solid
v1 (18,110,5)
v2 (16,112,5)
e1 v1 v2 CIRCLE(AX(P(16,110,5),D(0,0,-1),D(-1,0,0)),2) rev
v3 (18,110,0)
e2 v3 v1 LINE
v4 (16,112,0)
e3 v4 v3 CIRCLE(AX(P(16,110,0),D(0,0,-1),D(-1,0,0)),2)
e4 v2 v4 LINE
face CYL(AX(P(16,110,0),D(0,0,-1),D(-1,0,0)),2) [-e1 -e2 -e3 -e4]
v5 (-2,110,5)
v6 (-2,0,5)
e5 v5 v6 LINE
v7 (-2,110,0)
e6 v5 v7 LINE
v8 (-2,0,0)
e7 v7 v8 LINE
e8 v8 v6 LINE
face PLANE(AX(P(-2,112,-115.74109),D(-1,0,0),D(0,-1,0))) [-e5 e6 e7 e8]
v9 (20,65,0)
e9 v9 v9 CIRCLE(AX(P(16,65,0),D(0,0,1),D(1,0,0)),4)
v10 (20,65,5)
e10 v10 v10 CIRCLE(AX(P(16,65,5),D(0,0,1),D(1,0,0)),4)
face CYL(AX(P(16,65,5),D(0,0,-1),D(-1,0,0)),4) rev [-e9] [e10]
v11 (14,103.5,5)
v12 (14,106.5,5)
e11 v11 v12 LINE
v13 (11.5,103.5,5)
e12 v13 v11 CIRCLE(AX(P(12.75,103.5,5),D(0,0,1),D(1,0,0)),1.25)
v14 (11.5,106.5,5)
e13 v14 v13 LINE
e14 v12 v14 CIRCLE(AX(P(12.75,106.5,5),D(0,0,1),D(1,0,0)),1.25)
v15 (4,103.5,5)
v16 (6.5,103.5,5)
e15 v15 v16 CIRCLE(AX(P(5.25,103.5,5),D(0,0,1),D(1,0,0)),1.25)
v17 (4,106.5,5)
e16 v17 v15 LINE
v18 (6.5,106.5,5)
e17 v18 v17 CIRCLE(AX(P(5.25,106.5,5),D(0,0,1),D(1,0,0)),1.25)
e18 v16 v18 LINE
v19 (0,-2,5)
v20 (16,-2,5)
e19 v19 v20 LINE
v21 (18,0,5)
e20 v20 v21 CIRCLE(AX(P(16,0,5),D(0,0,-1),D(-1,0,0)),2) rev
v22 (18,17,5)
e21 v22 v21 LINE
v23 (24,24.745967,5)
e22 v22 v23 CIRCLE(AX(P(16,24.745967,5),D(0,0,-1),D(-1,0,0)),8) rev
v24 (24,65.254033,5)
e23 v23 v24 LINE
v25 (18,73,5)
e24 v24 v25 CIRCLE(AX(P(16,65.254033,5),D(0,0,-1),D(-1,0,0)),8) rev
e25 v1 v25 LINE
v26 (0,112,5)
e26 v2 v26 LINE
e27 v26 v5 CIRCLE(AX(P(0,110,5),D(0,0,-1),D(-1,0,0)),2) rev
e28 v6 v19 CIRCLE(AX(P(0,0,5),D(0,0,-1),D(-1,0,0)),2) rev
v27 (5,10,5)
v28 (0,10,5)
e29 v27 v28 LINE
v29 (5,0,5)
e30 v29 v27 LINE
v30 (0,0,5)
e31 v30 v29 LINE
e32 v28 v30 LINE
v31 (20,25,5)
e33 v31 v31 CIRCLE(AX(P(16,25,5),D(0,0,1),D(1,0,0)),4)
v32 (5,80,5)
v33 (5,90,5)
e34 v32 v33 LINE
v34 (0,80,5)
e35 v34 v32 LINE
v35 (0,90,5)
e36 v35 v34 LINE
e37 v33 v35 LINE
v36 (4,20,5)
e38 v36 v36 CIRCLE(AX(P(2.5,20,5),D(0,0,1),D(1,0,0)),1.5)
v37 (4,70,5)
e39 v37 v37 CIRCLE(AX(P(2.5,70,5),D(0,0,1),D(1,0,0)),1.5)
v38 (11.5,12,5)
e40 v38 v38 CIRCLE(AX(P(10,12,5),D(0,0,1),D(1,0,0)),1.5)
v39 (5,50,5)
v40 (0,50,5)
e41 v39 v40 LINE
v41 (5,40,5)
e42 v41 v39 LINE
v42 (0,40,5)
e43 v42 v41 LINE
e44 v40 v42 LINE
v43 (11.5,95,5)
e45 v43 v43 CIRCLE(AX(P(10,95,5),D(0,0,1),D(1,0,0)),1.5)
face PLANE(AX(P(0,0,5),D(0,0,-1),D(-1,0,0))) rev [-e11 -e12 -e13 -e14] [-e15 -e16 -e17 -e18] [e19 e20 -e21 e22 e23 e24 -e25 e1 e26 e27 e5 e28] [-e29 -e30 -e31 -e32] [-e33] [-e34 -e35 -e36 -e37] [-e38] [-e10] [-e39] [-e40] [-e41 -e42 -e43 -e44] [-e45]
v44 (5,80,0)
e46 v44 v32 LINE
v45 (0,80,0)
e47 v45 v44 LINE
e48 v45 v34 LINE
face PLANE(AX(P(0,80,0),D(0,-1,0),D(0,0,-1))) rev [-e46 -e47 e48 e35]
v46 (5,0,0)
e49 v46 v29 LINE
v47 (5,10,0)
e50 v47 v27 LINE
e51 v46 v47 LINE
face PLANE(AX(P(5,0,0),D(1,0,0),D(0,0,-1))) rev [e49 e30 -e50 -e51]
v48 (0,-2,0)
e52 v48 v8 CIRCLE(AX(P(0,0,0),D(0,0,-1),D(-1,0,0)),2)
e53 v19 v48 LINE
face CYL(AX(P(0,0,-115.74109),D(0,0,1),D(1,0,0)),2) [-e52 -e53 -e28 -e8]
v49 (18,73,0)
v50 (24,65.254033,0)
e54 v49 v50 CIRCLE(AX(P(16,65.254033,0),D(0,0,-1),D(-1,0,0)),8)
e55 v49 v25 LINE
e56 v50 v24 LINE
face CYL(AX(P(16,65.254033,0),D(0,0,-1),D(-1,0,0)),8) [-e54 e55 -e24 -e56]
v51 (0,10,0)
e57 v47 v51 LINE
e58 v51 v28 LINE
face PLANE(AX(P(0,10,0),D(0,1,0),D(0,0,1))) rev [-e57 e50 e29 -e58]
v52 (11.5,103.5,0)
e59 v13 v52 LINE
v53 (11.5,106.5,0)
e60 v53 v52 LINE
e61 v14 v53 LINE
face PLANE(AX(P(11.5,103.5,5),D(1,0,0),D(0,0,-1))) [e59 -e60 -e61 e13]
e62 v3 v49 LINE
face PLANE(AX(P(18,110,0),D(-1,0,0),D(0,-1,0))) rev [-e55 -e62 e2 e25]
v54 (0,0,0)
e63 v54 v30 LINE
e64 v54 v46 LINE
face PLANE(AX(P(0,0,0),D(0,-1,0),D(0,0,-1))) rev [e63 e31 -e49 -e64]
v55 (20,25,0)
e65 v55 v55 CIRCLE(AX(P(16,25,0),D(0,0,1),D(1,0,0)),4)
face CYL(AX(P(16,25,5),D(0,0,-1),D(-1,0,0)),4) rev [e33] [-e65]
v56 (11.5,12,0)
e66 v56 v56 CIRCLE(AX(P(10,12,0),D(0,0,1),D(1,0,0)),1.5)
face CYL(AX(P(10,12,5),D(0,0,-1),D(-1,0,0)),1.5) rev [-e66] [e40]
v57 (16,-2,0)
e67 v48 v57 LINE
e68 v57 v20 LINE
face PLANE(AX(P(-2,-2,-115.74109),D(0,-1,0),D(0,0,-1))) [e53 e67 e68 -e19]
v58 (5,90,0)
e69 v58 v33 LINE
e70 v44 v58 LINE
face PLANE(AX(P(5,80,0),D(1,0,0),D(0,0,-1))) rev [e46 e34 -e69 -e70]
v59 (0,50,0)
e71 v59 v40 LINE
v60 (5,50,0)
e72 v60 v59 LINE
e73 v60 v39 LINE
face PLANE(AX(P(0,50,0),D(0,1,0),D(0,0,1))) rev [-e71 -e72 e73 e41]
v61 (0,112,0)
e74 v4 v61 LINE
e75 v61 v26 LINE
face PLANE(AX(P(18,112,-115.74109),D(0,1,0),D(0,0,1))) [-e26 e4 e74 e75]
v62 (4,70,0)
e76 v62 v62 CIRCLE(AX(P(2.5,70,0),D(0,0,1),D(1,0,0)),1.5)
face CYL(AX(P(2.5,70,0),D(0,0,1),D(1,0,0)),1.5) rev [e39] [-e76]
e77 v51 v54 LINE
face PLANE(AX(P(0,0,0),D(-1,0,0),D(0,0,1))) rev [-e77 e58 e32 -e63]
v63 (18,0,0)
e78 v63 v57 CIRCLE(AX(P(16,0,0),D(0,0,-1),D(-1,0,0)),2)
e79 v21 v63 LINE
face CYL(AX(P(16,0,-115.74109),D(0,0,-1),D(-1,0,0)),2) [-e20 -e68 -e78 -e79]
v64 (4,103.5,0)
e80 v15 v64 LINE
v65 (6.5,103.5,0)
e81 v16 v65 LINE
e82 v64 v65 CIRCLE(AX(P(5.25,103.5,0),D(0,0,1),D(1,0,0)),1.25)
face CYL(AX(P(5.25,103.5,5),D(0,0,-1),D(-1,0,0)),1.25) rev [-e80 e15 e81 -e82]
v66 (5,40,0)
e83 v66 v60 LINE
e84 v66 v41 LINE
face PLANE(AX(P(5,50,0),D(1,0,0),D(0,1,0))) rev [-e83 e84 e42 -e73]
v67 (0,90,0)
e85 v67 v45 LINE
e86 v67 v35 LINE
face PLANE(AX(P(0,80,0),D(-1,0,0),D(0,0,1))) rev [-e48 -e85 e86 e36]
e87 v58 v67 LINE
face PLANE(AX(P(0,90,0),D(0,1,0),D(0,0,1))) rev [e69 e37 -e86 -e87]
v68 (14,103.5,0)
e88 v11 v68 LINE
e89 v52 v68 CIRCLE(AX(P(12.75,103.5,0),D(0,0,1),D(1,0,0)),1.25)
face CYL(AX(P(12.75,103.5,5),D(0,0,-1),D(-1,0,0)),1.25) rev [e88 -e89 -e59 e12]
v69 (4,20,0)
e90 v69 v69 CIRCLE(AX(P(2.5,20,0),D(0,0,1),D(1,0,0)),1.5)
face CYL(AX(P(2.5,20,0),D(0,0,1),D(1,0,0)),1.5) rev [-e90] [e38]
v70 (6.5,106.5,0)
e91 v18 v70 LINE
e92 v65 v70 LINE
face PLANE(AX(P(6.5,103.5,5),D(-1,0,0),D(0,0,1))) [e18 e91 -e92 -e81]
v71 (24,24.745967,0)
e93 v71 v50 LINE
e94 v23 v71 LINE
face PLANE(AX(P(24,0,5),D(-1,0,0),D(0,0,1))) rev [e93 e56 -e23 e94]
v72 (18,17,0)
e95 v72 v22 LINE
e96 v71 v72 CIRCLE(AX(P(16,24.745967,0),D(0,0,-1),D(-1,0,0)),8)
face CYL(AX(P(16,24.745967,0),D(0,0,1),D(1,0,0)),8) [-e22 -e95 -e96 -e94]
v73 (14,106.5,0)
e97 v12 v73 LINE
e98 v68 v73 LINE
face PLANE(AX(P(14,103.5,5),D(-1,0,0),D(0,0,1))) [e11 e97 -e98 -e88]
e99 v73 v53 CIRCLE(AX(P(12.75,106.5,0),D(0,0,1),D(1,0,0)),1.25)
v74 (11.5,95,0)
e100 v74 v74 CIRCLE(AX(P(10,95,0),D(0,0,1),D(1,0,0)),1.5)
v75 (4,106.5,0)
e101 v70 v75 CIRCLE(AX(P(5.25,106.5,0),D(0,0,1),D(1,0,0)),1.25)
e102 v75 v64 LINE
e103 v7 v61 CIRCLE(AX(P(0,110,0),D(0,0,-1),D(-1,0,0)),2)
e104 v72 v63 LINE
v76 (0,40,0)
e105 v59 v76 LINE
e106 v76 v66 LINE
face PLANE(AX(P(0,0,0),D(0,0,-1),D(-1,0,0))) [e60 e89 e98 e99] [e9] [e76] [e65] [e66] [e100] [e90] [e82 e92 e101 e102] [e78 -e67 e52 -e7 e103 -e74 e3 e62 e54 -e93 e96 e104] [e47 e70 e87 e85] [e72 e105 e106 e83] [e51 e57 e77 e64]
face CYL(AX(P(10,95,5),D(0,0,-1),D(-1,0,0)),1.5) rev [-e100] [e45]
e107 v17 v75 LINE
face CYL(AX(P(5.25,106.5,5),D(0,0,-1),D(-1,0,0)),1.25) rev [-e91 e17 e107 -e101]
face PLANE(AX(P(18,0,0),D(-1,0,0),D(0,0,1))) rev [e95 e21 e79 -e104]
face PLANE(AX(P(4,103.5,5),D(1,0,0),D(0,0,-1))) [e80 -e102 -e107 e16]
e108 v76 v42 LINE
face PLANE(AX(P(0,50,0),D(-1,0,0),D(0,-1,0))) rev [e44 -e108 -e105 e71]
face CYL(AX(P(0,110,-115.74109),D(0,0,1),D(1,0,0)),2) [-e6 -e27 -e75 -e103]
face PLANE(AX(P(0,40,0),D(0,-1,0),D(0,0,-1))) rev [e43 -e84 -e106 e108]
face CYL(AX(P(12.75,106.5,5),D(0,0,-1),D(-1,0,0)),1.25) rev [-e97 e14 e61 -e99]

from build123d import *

# Parameters (mm, degrees)
SKETCH1_W           = 24
SKETCH1_H           = 110
SKETCH1_R           = 4
SKETCH1_R_2         = 1.5
BOSS_EXTRUDE1_DEPTH = 5
SKETCH2_W           = 6
SKETCH2_H           = 37
SKETCH2_H_2         = 17
CUT_EXTRUDE1_DEPTH  = 113.698713391
BOSS_EXTRUDE2_DEPTH = 5
SKETCH4_R           = 1.5
SKETCH4_W           = 5
SKETCH4_H           = 10
CUT_EXTRUDE2_DEPTH  = 115.651646303
FILLET1_R           = 2
FILLET2_R           = 8


with BuildPart() as part:
    # Sketch1 → Boss-Extrude1 (new body)
    with BuildSketch(Plane.XY):
        with Locations((12, 55)):
            Rectangle(SKETCH1_W, SKETCH1_H)
        with Locations((16, 65)):
            Circle(SKETCH1_R, mode=Mode.SUBTRACT)
        with Locations((16, 25)):
            Circle(SKETCH1_R, mode=Mode.SUBTRACT)
        with Locations((10, 12)):
            Circle(SKETCH1_R_2, mode=Mode.SUBTRACT)
        with Locations((10, 95)):
            Circle(SKETCH1_R_2, mode=Mode.SUBTRACT)
        with BuildLine():
            Line((4, 103.5), (4, 106.5))
            ThreePointArc((4, 106.5), (5.25, 107.75), (6.5, 106.5))
            Line((6.5, 106.5), (6.5, 103.5))
            ThreePointArc((6.5, 103.5), (5.25, 102.25), (4, 103.5))
        make_face(mode=Mode.SUBTRACT)
        with BuildLine():
            Line((11.5, 103.5), (11.5, 106.5))
            ThreePointArc((11.5, 106.5), (12.75, 107.75), (14, 106.5))
            Line((14, 106.5), (14, 103.5))
            ThreePointArc((14, 103.5), (12.75, 102.25), (11.5, 103.5))
        make_face(mode=Mode.SUBTRACT)
    extrude(amount=BOSS_EXTRUDE1_DEPTH)

    # Sketch2 → Cut-Extrude1 (cut, through all)
    with BuildSketch(Plane.XY.offset(5)):
        with Locations((21, 91.5)):
            Rectangle(SKETCH2_W, SKETCH2_H)
        with Locations((21, 8.5)):
            Rectangle(SKETCH2_W, SKETCH2_H_2)
    extrude(amount=-CUT_EXTRUDE1_DEPTH, mode=Mode.SUBTRACT)

    # Sketch3 → Boss-Extrude2 (add)
    with BuildSketch(Plane.XY.offset(5)):
        Polygon((18, -2), (18, 0), (0, 0), (0, 110), (18, 110), (18, 112), (-2, 112), (-2, -2), align=None)
    extrude(amount=-BOSS_EXTRUDE2_DEPTH)

    # Sketch4 → Cut-Extrude2 (cut, through all)
    with BuildSketch(Plane.XY.offset(5)):
        with Locations((2.5, 20)):
            Circle(SKETCH4_R)
        with Locations((2.5, 70)):
            Circle(SKETCH4_R)
        with Locations((2.5, 5)):
            Rectangle(SKETCH4_W, SKETCH4_H)
        with Locations((2.5, 85)):
            Rectangle(SKETCH4_W, SKETCH4_H)
        with Locations((2.5, 45)):
            Rectangle(SKETCH4_W, SKETCH4_H)
    extrude(amount=-CUT_EXTRUDE2_DEPTH, mode=Mode.SUBTRACT)

    # Fillet1
    fillet1_edges = [part.edges().sort_by_distance(p)[0] for p in [
        (18, 112, 2.5),
        (-2, 112, 2.5),
        (-2, -2, 2.5),
        (18, -2, 2.5),
    ]]
    fillet(fillet1_edges, radius=FILLET1_R)

    # Fillet2
    # the kernel refuses this fillet: 8 mm, written as the material it takes off along each edge
    with BuildSketch(Plane(origin=(24, 17, 24.364916731), x_dir=(0, 1, 0), z_dir=(0, 0, -1))) as fillet2_piece_1:
        with BuildLine():
            CenterArc((7.745966692, -8), FILLET2_R, 90, 75.522487814)
            Line((0, -6), (-0.154919334, -5.96))
            ThreePointArc((-0.154919334, -5.96), (-0.16, -3), (-0.16, 0))
            Line((-0.16, 0), (0, 0.16))
            Line((0, 0.16), (7.745966692, 0.16))
            Line((7.745966692, 0.16), (7.745966692, 0))
        make_face()
    extrude(amount=43.729833462, mode=Mode.SUBTRACT)
    with BuildSketch(Plane(origin=(24, 73, 24.364916731), x_dir=(-1, 0, 0), z_dir=(0, 0, -1))) as fillet2_piece_2:
        with BuildLine():
            CenterArc((8, -7.745966692), FILLET2_R, 104.477512186, 75.522487814)
            Line((0, -7.745966692), (-0.16, -7.745966692))
            Line((-0.16, -7.745966692), (-0.16, 0))
            Line((-0.16, 0), (0, 0.16))
            ThreePointArc((0, 0.16), (3, 0.16), (5.96, 0.154919334))
            Line((5.96, 0.154919334), (6, 0))
        make_face()
    extrude(amount=43.729833462, mode=Mode.SUBTRACT)


solid = part.part
